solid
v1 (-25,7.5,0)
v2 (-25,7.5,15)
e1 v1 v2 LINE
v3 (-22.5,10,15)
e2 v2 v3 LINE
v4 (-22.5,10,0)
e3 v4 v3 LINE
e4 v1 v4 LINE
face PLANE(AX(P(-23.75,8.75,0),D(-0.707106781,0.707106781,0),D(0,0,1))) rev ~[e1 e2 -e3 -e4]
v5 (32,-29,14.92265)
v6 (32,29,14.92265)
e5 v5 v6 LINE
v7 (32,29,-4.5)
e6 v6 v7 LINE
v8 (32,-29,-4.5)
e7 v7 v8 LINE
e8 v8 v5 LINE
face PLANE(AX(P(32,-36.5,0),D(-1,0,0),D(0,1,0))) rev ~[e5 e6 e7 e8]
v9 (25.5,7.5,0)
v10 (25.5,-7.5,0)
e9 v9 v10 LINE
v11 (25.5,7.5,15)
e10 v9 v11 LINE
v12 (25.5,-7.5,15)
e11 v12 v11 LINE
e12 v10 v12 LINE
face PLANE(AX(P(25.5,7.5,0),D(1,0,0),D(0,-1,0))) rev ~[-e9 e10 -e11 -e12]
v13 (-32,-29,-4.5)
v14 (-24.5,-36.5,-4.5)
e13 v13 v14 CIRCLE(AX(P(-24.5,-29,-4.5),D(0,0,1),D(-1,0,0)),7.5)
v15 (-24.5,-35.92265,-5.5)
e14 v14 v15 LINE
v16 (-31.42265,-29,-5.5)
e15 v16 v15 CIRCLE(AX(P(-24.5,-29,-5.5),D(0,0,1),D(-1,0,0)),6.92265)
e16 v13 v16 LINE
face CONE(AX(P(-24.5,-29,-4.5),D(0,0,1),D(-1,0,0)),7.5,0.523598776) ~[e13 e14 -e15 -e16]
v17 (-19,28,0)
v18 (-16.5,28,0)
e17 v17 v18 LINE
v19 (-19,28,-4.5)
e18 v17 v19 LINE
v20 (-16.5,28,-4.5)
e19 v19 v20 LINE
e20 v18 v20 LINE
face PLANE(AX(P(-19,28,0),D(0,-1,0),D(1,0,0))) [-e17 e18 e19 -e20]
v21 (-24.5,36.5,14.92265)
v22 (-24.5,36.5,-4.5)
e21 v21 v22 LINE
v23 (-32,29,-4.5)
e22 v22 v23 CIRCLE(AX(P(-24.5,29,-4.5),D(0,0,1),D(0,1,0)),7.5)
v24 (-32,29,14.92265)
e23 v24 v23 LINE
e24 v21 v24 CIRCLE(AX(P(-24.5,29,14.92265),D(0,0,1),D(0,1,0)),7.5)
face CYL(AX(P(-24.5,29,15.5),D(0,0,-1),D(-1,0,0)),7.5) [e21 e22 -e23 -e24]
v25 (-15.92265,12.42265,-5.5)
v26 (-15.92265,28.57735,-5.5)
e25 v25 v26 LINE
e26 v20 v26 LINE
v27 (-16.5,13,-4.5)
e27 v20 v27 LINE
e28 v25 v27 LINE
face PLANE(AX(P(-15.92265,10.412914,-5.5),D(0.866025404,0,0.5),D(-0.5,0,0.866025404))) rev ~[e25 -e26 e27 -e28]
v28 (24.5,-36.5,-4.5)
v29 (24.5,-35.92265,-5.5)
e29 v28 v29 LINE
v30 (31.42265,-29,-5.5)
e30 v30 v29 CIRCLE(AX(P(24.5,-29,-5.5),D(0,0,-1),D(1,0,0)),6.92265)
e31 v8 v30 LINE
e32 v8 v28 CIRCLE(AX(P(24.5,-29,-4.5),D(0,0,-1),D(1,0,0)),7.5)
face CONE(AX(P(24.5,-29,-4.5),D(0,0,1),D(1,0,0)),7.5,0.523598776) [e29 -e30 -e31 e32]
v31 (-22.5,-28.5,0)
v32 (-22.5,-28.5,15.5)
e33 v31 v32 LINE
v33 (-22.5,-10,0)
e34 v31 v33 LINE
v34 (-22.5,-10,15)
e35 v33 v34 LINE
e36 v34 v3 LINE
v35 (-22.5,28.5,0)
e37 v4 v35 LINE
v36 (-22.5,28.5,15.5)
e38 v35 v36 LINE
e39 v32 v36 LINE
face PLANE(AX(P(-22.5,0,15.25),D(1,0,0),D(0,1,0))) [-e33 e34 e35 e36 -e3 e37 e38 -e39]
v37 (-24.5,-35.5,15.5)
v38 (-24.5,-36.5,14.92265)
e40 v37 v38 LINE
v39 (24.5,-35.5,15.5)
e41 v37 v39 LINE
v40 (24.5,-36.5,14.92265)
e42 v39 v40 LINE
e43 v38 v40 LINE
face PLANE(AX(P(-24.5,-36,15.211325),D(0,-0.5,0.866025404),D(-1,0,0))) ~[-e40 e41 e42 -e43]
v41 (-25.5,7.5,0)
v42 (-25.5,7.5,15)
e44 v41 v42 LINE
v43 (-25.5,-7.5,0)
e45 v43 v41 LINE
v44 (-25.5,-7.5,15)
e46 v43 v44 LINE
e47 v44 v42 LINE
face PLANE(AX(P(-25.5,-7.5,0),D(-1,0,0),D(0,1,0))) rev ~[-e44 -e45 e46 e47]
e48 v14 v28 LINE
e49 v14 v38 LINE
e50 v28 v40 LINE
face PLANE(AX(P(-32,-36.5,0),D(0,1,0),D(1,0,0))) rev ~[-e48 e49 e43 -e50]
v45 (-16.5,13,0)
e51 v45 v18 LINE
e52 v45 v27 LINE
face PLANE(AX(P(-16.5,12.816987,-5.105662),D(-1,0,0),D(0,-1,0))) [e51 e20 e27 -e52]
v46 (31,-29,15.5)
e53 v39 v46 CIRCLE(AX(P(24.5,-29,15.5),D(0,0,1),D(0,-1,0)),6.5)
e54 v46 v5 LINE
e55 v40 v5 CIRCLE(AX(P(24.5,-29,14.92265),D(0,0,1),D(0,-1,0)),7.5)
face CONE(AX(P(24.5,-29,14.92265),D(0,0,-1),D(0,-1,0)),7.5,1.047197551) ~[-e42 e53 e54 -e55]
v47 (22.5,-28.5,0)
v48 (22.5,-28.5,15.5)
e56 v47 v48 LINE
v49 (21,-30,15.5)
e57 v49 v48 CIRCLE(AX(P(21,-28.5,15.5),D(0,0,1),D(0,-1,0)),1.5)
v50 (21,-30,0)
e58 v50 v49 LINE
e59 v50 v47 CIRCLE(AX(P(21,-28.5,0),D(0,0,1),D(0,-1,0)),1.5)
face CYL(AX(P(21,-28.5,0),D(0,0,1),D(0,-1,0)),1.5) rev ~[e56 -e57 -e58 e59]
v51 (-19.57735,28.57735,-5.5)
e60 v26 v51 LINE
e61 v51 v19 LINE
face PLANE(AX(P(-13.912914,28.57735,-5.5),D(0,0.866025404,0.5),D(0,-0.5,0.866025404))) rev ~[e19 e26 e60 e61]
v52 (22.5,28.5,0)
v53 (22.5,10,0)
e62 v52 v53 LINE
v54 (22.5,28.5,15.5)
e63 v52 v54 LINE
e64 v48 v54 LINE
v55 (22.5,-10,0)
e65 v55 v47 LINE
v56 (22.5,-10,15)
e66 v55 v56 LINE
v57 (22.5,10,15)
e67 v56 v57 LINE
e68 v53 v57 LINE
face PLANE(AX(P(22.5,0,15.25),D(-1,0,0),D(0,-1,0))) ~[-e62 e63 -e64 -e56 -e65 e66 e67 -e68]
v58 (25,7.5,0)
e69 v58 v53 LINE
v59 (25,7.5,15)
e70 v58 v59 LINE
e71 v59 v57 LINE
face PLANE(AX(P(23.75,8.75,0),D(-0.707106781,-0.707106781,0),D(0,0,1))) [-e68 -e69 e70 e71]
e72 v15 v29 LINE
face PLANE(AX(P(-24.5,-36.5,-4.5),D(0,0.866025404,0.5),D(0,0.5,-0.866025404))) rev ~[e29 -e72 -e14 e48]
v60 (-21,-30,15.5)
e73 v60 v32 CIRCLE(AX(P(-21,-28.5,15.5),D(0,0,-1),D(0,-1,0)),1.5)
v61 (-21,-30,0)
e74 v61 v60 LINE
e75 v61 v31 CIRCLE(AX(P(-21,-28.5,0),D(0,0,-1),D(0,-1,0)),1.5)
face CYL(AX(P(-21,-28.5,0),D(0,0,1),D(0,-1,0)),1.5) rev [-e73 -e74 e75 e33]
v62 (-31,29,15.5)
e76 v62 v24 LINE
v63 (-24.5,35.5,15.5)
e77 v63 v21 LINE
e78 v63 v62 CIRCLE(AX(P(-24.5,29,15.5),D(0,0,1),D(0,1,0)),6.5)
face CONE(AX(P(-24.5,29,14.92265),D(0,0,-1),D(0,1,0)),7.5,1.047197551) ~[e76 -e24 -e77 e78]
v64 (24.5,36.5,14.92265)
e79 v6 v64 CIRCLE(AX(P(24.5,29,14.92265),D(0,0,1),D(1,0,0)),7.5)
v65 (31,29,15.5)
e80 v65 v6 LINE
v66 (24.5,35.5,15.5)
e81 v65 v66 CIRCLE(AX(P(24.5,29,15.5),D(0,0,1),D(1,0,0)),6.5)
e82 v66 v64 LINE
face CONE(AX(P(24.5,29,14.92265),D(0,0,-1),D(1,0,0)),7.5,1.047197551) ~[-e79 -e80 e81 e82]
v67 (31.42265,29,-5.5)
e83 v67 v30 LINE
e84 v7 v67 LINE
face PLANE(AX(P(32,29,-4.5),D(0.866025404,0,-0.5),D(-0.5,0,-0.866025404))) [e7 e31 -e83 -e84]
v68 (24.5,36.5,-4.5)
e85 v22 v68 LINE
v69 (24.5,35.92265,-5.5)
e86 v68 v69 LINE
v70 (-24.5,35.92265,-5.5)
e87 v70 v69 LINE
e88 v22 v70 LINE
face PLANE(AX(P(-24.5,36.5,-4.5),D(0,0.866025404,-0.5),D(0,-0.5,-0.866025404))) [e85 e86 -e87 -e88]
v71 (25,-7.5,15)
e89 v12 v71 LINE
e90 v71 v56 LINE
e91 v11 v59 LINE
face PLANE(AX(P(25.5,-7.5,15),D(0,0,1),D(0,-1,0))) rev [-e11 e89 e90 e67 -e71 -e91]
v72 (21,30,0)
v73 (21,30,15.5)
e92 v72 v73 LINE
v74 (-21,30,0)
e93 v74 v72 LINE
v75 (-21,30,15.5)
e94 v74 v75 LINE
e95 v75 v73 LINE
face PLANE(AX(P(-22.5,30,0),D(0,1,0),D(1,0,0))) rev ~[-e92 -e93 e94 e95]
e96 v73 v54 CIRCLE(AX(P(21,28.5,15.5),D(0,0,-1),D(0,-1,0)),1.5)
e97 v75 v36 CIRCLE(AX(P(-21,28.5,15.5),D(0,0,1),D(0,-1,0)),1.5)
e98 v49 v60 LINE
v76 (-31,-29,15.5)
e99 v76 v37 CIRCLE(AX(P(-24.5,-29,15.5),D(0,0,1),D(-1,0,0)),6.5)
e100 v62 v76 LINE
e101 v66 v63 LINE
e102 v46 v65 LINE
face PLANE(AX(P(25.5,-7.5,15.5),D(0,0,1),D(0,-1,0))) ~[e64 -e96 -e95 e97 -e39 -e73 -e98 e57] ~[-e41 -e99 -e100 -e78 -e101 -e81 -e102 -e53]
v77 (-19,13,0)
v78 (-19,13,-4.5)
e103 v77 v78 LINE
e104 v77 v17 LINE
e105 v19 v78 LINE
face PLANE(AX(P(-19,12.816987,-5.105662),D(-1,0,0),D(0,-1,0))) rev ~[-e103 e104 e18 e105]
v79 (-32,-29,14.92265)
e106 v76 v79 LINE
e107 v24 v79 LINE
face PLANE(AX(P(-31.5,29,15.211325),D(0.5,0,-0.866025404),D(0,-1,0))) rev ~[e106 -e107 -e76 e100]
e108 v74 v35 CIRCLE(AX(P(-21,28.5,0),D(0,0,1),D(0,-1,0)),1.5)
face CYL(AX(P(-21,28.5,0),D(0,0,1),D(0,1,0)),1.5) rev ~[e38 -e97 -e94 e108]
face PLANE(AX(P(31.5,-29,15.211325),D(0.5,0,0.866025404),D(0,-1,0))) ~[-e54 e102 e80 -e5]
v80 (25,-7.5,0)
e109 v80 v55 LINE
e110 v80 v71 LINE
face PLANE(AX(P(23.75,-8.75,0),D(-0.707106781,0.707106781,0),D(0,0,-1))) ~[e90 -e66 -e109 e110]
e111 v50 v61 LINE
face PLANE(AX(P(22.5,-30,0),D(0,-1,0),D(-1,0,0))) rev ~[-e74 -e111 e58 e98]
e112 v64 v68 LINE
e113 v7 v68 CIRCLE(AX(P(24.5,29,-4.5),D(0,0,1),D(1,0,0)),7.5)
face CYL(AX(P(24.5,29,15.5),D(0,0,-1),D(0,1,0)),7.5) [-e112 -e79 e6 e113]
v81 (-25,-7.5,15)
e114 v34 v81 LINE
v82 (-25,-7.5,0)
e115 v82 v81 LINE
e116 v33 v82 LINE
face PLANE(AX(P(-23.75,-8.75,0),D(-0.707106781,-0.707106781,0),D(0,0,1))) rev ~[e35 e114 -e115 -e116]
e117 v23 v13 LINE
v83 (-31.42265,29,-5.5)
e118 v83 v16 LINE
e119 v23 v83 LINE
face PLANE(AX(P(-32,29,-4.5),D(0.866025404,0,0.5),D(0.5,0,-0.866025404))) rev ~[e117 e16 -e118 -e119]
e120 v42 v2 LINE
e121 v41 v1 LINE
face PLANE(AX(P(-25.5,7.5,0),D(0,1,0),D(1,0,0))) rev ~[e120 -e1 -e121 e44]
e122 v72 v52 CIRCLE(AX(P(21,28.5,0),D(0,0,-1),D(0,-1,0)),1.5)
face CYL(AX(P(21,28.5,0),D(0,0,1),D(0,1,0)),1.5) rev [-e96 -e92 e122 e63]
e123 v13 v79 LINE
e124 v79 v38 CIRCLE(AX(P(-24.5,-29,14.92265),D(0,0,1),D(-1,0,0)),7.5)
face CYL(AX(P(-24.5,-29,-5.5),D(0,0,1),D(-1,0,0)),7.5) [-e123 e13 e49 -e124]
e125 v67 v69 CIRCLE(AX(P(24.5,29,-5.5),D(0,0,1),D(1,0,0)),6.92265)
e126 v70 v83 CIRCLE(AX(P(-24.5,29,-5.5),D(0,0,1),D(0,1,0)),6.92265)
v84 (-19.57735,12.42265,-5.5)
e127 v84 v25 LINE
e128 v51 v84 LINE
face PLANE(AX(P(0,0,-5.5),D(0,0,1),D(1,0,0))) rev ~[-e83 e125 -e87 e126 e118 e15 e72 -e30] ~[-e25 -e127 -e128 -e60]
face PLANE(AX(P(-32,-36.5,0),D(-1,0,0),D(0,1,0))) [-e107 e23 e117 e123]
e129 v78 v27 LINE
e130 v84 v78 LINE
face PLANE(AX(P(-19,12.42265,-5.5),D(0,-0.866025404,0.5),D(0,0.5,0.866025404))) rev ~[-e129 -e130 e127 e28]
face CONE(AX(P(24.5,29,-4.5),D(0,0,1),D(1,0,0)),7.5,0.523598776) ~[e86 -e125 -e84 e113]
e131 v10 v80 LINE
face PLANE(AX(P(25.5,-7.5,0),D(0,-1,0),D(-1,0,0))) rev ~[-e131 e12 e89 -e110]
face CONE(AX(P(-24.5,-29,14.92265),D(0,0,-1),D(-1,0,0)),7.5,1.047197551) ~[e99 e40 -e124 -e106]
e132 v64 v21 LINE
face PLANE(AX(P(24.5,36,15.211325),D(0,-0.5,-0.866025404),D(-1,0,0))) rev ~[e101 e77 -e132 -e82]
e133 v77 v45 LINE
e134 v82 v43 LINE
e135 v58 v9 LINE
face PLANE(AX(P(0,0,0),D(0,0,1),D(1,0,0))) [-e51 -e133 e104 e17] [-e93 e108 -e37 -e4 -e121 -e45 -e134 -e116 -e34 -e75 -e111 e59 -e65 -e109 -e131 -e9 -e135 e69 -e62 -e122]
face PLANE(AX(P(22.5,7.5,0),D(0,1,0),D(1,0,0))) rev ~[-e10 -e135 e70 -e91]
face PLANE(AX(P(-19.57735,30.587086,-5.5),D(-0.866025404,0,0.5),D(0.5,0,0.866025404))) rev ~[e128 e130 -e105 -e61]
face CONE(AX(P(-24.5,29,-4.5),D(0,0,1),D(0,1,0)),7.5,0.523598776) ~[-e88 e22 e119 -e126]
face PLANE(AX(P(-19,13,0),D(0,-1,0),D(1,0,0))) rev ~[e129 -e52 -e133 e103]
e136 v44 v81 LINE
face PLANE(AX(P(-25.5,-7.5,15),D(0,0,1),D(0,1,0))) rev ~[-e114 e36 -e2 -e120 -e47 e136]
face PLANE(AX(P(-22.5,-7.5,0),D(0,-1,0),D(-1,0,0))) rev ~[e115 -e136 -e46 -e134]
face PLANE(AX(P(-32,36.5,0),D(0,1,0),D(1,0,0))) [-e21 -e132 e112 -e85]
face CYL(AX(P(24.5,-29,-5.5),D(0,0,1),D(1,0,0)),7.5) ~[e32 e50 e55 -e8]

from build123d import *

# Parameters (mm, degrees)
F0_W          = 64
F0_H          = 73
F1_DEPTH      = 5.5
F2_DEPTH      = 15.5
F3_W          = 15
F3_H          = 0.5
F4_DEPTH      = 3
F6_W          = 2.5
F6_H          = 15
F7_DEPTH      = 5.501
F8_SIZE       = 2.5
F9_R          = 1.5
F10_R         = 7.5
F11_T1_DEPTH  = 58
F11_T3_DEPTH  = 49
F11_T5_DEPTH  = 2.5
F11_T7_DEPTH  = 15
F11_T10_ANGLE = 90
F11_T12_ANGLE = 90
F11_T14_ANGLE = 90
F11_T16_ANGLE = 90
F11_T21_DEPTH = 5.0870857546
F11_T25_DEPTH = 17.5870857546
F11_T32_DEPTH = 5.0870857546
F11_T36_DEPTH = 17.5870857546
F11_T43_DEPTH = 17.5870857546
F11_T47_DEPTH = 5.0870857546
F11_T54_DEPTH = 5.0870857546
F11_T58_DEPTH = 17.5870857546
F12_SIZE2     = 0.5773502692
F12_SIZE      = 1


# Not quite as in the source:
# - a fillet or chamfer that OpenCascade refuses, or shapes differently, is made with other operations: its cross-section is extruded or revolved along the edge and cut away or added


with BuildPart() as f1:
    # F0 (on Top) → F1 (new body)
    with BuildSketch(Plane.XY):
        Rectangle(F0_W, F0_H)
        Polygon((-22.5, 7.5), (-22.5, 30), (22.5, 30), (22.5, 7.5), (25.5, 7.5), (25.5, -7.5), (22.5, -7.5), (22.5, -30), (-22.5, -30), (-22.5, -7.5), (-25.5, -7.5), (-25.5, 7.5), align=None, mode=Mode.SUBTRACT)
        Polygon((22.5, 30), (-22.5, 30), (-22.5, 7.5), (-25.5, 7.5), (-25.5, -7.5), (-22.5, -7.5), (-22.5, -30), (22.5, -30), (22.5, -7.5), (25.5, -7.5), (25.5, 7.5), (22.5, 7.5), align=None)
    extrude(amount=-F1_DEPTH)

    # F0 (on Top) → F2 (join)
    with BuildSketch(Plane.XY):
        Rectangle(F0_W, F0_H)
        Polygon((-22.5, 7.5), (-22.5, 30), (22.5, 30), (22.5, 7.5), (25.5, 7.5), (25.5, -7.5), (22.5, -7.5), (22.5, -30), (-22.5, -30), (-22.5, -7.5), (-25.5, -7.5), (-25.5, 7.5), align=None, mode=Mode.SUBTRACT)
    extrude(amount=F2_DEPTH)

    # F3 (on face) → F4 (join, through all)
    with BuildSketch(Plane.YZ.offset(-25.5)):
        with Locations((0, 15.25)):
            Rectangle(F3_W, F3_H)
    extrude(amount=F4_DEPTH)

    # F5: F1 across plane


with BuildPart() as f1_1:
    add(f1.part)
    add(f1.part.mirror(Plane.YZ))

    # F6 (on face) → F7 (cut, through all)
    with BuildSketch(Plane.XY):
        with Locations((-17.75, 20.5)):
            Rectangle(F6_W, F6_H)
    extrude(amount=-F7_DEPTH, mode=Mode.SUBTRACT)

    # F8
    f8_edges = [f1_1.edges().sort_by_distance(p)[0] for p in [
        (-22.5, -7.5, 7.5),
        (-22.5, 7.5, 7.5),
        (22.5, 7.5, 7.5),
        (22.5, -7.5, 7.5),
    ]]
    chamfer(f8_edges, length=F8_SIZE)

    # F9
    f9_edges = [f1_1.edges().sort_by_distance(p)[0] for p in [
        (-22.5, 30, 7.75),
        (-22.5, -30, 7.75),
        (22.5, 30, 7.75),
        (22.5, -30, 7.75),
    ]]
    fillet(f9_edges, radius=F9_R)

    # F10
    f10_edges = [f1_1.edges().sort_by_distance(p)[0] for p in [
        (-32, -36.5, 5),
        (32, -36.5, 5),
        (-32, 36.5, 5),
        (32, 36.5, 5),
    ]]
    fillet(f10_edges, radius=F10_R)

    # F11: chamfer of 1 x 0.5773502692 on 12 edges, made by hand

    # F11_s2 → F11_t1 (cut)
    with BuildSketch(Plane.XZ.offset(-29)):
        Polygon((32, -4.5), (31.4226497308, -5.5), (32, -5.5), align=None)
        Polygon((-32, -4.5), (-31.4226497308, -5.5), (-32, -5.5), align=None)
    extrude(amount=F11_T1_DEPTH, mode=Mode.SUBTRACT)

    # F11_s4 → F11_t3 (cut)
    with BuildSketch(Plane.YZ.offset(-24.5)):
        Polygon((-36.5, -4.5), (-35.9226497308, -5.5), (-36.5, -5.5), align=None)
        Polygon((36.5, -4.5), (35.9226497308, -5.5), (36.5, -5.5), align=None)
    extrude(amount=F11_T3_DEPTH, mode=Mode.SUBTRACT)

    # F11_s6 → F11_t5 (cut)
    with BuildSketch(Plane.YZ.offset(-19)):
        Polygon((28.5773502692, -5.5), (28, -4.5), (28, -5.5), align=None)
        Polygon((12.4226497308, -5.5), (13, -4.5), (13, -5.5), align=None)
    extrude(amount=F11_T5_DEPTH, mode=Mode.SUBTRACT)

    # F11_s8 → F11_t7 (cut)
    with BuildSketch(Plane.XZ.offset(-28)):
        Polygon((-19.5773502692, -5.5), (-19, -4.5), (-19, -5.5), align=None)
        Polygon((-15.9226497308, -5.5), (-16.5, -4.5), (-16.5, -5.5), align=None)
    extrude(amount=F11_T7_DEPTH, mode=Mode.SUBTRACT)

    # F11_s9 → F11_t10 (revolve, cut)
    with BuildSketch(Plane.XZ.offset(29)):
        Polygon((32, -4.5), (31.4226497308, -5.5), (32, -5.5), align=None)
    revolve(axis=Axis((24.5, -29, -5.5), (0, 0, -1)), revolution_arc=F11_T10_ANGLE, mode=Mode.SUBTRACT)

    # F11_s11 → F11_t12 (revolve, cut)
    with BuildSketch(Plane.XZ.offset(-29)):
        Polygon((32, -4.5), (31.4226497308, -5.5), (32, -5.5), align=None)
    revolve(axis=Axis((24.5, 29, -5.5), (0, 0, 1)), revolution_arc=F11_T12_ANGLE, mode=Mode.SUBTRACT)

    # F11_s13 → F11_t14 (revolve, cut)
    with BuildSketch(Plane.XZ.offset(29)):
        Polygon((-32, -4.5), (-31.4226497308, -5.5), (-32, -5.5), align=None)
    revolve(axis=Axis((-24.5, -29, -5.5), (0, 0, 1)), revolution_arc=F11_T14_ANGLE, mode=Mode.SUBTRACT)

    # F11_s15 → F11_t16 (revolve, cut)
    with BuildSketch(Plane.YZ.offset(-24.5)):
        Polygon((36.5, -4.5), (35.9226497308, -5.5), (36.5, -5.5), align=None)
    revolve(axis=Axis((-24.5, 29, -5.5), (0, 0, 1)), revolution_arc=F11_T16_ANGLE, mode=Mode.SUBTRACT)


with BuildPart() as f11_tool19:
    # F11_s20 → F11_t21 (new body)
    with BuildSketch(Plane.YZ.offset(-13.9129142454)):
        Polygon((28.5773502692, -5.5), (28, -4.5), (28, -5.5), align=None)
    extrude(amount=-F11_T21_DEPTH)

    split(bisect_by=Plane.YZ.offset(-16.5), keep=Keep.TOP)


with BuildPart() as f11_tool23:
    # F11_s24 → F11_t25 (new body)
    with BuildSketch(Plane.XZ.offset(-13)):
        Polygon((-15.9226497308, -5.5), (-16.5, -4.5), (-16.5, -5.5), align=None)
    extrude(amount=-F11_T25_DEPTH)

    split(bisect_by=Plane.XZ.offset(-28), keep=Keep.BOTTOM)


with BuildPart() as f11_tool19_1:
    add(f11_tool19.part)

    # F11_t27: intersect F11_tool23
    add(f11_tool23.part, mode=Mode.INTERSECT)


with BuildPart() as f1_2:
    add(f1_1.part)

    # F11_t17: cut F11_tool19
    add(f11_tool19_1.part, mode=Mode.SUBTRACT)


with BuildPart() as f11_tool30:
    # F11_s31 → F11_t32 (new body)
    with BuildSketch(Plane.YZ.offset(-16.5)):
        Polygon((28.5773502692, -5.5), (28, -4.5), (28, -5.5), align=None)
    extrude(amount=-F11_T32_DEPTH)

    split(bisect_by=Plane.YZ.offset(-19), keep=Keep.BOTTOM)


with BuildPart() as f11_tool34:
    # F11_s35 → F11_t36 (new body)
    with BuildSketch(Plane.XZ.offset(-30.5870857546)):
        Polygon((-19.5773502692, -5.5), (-19, -4.5), (-19, -5.5), align=None)
    extrude(amount=F11_T36_DEPTH)

    split(bisect_by=Plane.XZ.offset(-28), keep=Keep.BOTTOM)


with BuildPart() as f11_tool30_1:
    add(f11_tool30.part)

    # F11_t38: intersect F11_tool34
    add(f11_tool34.part, mode=Mode.INTERSECT)


with BuildPart() as f1_3:
    add(f1_2.part)

    # F11_t28: cut F11_tool30
    add(f11_tool30_1.part, mode=Mode.SUBTRACT)


with BuildPart() as f11_tool41:
    # F11_s42 → F11_t43 (new body)
    with BuildSketch(Plane.XZ.offset(-28)):
        Polygon((-19.5773502692, -5.5), (-19, -4.5), (-19, -5.5), align=None)
    extrude(amount=F11_T43_DEPTH)

    split(bisect_by=Plane.XZ.offset(-13), keep=Keep.TOP)


with BuildPart() as f11_tool45:
    # F11_s46 → F11_t47 (new body)
    with BuildSketch(Plane.YZ.offset(-21.5870857546)):
        Polygon((12.4226497308, -5.5), (13, -4.5), (13, -5.5), align=None)
    extrude(amount=F11_T47_DEPTH)

    split(bisect_by=Plane.YZ.offset(-19), keep=Keep.BOTTOM)


with BuildPart() as f11_tool41_1:
    add(f11_tool41.part)

    # F11_t49: intersect F11_tool45
    add(f11_tool45.part, mode=Mode.INTERSECT)


with BuildPart() as f1_4:
    add(f1_3.part)

    # F11_t39: cut F11_tool41
    add(f11_tool41_1.part, mode=Mode.SUBTRACT)


with BuildPart() as f11_tool52:
    # F11_s53 → F11_t54 (new body)
    with BuildSketch(Plane.YZ.offset(-19)):
        Polygon((12.4226497308, -5.5), (13, -4.5), (13, -5.5), align=None)
    extrude(amount=F11_T54_DEPTH)

    split(bisect_by=Plane.YZ.offset(-16.5), keep=Keep.TOP)


with BuildPart() as f11_tool56:
    # F11_s57 → F11_t58 (new body)
    with BuildSketch(Plane.XZ.offset(-10.4129142454)):
        Polygon((-15.9226497308, -5.5), (-16.5, -4.5), (-16.5, -5.5), align=None)
    extrude(amount=-F11_T58_DEPTH)

    split(bisect_by=Plane.XZ.offset(-13), keep=Keep.TOP)


with BuildPart() as f11_tool52_1:
    add(f11_tool52.part)

    # F11_t60: intersect F11_tool56
    add(f11_tool56.part, mode=Mode.INTERSECT)


with BuildPart() as f1_5:
    add(f1_4.part)

    # F11_t50: cut F11_tool52
    add(f11_tool52_1.part, mode=Mode.SUBTRACT)

    # F12
    f12_edges = [f1_5.edges().sort_by_distance(p)[0] for p in [
        (-29.803301, -34.303301, 15.5),
        (-32, 0, 15.5),
        (0, -36.5, 15.5),
        (29.803301, -34.303301, 15.5),
        (32, 0, 15.5),
        (29.803301, 34.303301, 15.5),
        (0, 36.5, 15.5),
        (-29.803301, 34.303301, 15.5),
    ]]
    chamfer(f12_edges, length=F12_SIZE, length2=F12_SIZE2)


solid = f1_5.part
